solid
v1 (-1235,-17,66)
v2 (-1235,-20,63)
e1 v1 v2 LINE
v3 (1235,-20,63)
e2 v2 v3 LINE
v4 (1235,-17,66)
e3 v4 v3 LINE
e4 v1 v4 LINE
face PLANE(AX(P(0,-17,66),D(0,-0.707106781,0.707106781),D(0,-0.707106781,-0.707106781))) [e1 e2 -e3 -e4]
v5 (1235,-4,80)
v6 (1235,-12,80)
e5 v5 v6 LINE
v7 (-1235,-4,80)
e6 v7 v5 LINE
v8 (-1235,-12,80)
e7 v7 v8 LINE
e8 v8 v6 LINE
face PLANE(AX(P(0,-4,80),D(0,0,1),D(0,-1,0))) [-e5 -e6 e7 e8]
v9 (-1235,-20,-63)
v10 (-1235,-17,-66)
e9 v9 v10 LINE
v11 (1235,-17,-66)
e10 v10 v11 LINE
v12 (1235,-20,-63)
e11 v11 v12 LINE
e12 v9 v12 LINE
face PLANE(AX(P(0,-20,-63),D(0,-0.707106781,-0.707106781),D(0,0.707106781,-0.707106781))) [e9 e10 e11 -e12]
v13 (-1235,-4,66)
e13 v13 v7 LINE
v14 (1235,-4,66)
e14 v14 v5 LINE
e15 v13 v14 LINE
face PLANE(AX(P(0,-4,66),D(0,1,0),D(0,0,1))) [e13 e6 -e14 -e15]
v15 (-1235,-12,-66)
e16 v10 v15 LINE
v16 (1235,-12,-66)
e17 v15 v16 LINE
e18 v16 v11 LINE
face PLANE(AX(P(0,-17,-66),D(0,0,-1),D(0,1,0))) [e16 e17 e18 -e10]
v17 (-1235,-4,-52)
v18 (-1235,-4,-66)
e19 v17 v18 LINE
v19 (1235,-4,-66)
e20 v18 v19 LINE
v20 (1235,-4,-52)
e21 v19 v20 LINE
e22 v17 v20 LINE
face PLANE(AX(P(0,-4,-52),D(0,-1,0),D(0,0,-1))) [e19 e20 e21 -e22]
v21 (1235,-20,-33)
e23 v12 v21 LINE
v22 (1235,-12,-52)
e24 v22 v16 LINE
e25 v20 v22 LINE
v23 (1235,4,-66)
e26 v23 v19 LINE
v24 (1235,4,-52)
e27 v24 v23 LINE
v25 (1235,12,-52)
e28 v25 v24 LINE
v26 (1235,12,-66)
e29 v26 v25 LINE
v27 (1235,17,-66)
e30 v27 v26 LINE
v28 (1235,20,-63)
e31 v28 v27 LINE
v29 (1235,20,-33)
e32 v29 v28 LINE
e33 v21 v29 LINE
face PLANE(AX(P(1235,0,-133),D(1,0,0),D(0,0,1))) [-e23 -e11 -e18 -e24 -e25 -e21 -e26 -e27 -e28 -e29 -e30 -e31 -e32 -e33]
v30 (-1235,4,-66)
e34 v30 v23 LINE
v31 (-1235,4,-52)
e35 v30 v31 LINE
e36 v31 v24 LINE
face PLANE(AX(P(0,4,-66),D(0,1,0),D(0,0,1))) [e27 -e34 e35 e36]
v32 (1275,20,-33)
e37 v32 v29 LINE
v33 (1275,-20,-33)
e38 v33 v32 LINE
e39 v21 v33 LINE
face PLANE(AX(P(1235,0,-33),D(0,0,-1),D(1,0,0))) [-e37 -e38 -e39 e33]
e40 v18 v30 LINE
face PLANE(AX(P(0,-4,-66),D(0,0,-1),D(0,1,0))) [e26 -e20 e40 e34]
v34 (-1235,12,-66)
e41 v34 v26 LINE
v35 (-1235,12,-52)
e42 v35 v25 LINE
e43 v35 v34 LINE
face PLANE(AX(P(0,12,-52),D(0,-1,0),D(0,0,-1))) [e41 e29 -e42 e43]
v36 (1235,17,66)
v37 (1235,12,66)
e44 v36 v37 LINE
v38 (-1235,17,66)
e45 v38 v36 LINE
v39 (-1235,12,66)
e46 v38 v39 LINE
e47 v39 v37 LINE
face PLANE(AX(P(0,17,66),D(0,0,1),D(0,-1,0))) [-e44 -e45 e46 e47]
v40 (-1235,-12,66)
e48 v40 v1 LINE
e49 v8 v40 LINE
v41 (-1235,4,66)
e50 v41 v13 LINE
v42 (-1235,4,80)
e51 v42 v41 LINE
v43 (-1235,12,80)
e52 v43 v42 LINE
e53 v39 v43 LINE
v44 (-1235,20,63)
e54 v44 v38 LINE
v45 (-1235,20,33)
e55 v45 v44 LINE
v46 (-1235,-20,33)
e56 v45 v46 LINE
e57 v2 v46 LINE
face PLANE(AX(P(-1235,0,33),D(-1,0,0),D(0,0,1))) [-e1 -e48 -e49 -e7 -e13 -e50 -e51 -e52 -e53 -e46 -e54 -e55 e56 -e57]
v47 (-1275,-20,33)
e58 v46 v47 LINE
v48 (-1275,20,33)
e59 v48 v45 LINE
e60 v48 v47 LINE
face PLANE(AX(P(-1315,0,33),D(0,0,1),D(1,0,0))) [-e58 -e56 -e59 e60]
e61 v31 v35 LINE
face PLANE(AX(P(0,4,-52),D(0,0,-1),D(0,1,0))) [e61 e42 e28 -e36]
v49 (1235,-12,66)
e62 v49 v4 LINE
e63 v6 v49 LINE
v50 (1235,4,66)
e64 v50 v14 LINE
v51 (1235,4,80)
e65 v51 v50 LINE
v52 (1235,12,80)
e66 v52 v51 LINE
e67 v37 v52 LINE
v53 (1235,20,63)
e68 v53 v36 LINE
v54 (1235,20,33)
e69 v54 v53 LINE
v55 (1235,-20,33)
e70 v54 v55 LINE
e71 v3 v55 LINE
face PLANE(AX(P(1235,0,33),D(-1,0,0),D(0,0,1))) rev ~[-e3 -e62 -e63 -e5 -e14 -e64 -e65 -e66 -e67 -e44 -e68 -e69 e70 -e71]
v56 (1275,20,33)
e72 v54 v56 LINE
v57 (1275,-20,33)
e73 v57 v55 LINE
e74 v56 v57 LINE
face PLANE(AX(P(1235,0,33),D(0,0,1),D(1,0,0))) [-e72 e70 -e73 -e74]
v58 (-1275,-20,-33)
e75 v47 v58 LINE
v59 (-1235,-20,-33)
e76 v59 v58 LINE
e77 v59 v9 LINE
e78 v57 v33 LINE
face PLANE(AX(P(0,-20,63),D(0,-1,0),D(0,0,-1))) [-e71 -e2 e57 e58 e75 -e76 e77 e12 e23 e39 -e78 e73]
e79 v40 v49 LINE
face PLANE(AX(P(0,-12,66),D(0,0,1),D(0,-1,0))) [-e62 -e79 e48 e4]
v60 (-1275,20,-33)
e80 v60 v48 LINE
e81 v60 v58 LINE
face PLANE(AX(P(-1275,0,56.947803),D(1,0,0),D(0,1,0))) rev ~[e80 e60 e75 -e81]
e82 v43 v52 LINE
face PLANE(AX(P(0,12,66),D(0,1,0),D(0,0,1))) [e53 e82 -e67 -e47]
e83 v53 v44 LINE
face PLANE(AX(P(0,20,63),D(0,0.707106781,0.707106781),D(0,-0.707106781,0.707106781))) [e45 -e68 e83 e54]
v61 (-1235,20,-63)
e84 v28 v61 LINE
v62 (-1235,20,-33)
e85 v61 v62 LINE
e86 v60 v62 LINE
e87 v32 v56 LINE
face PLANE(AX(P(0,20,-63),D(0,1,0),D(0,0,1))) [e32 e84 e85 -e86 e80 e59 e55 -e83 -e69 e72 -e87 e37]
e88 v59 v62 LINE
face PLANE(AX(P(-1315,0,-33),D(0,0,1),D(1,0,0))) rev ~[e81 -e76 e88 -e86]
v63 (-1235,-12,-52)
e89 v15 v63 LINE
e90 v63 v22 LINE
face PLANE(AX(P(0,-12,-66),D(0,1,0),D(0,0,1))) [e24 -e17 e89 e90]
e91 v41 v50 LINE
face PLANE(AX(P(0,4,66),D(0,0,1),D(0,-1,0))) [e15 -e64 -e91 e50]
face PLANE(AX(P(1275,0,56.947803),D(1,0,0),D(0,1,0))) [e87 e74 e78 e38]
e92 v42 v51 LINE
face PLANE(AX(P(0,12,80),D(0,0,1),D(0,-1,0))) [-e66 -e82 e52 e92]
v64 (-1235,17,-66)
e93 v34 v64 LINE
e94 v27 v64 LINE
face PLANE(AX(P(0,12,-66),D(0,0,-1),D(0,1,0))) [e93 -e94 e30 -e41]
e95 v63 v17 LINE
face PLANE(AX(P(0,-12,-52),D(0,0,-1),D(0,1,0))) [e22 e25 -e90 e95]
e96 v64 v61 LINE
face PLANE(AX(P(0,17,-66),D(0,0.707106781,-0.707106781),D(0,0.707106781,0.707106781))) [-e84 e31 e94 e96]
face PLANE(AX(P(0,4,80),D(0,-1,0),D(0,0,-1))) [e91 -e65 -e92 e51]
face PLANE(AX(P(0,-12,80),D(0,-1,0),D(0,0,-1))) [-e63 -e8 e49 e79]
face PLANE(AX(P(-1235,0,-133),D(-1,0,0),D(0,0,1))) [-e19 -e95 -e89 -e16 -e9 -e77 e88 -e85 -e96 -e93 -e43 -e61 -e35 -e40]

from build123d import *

# Parameters (mm, degrees)
F1_W     = 40
F1_H     = 33
F3_DEPTH = 1275
F2_W     = 80
F2_H     = 100
F4_DEPTH = 25


with BuildPart() as f3:
    # F1 (on Right) → F3 (new body, symmetric)
    with BuildSketch(Plane.YZ):
        Polygon((20, 33), (20, 63), (17, 66), (12, 66), (12, 80), (4, 80), (4, 66), (-4, 66), (-4, 80), (-12, 80), (-12, 66), (-17, 66), (-20, 63), (-20, 33), align=None)
        with Locations((0, 16.5)):
            Rectangle(F1_W, F1_H)
        with Locations((0, -16.5)):
            Rectangle(F1_W, F1_H)
        Polygon((20, -63), (20, -33), (-20, -33), (-20, -63), (-17, -66), (-12, -66), (-12, -52), (-4, -52), (-4, -66), (4, -66), (4, -52), (12, -52), (12, -66), (17, -66), align=None)
    extrude(amount=F3_DEPTH, both=True)

    # F2 (on Front) → F4 (cut, symmetric)
    with BuildSketch(Plane.XZ):
        with Locations((-1275, 83)):
            Rectangle(F2_W, F2_H)
        with Locations((-1275, -83)):
            Rectangle(F2_W, F2_H)
        with Locations((1275, 83)):
            Rectangle(F2_W, F2_H)
        with Locations((1275, -83)):
            Rectangle(F2_W, F2_H)
    extrude(amount=F4_DEPTH, both=True, mode=Mode.SUBTRACT)


solid = f3.part
